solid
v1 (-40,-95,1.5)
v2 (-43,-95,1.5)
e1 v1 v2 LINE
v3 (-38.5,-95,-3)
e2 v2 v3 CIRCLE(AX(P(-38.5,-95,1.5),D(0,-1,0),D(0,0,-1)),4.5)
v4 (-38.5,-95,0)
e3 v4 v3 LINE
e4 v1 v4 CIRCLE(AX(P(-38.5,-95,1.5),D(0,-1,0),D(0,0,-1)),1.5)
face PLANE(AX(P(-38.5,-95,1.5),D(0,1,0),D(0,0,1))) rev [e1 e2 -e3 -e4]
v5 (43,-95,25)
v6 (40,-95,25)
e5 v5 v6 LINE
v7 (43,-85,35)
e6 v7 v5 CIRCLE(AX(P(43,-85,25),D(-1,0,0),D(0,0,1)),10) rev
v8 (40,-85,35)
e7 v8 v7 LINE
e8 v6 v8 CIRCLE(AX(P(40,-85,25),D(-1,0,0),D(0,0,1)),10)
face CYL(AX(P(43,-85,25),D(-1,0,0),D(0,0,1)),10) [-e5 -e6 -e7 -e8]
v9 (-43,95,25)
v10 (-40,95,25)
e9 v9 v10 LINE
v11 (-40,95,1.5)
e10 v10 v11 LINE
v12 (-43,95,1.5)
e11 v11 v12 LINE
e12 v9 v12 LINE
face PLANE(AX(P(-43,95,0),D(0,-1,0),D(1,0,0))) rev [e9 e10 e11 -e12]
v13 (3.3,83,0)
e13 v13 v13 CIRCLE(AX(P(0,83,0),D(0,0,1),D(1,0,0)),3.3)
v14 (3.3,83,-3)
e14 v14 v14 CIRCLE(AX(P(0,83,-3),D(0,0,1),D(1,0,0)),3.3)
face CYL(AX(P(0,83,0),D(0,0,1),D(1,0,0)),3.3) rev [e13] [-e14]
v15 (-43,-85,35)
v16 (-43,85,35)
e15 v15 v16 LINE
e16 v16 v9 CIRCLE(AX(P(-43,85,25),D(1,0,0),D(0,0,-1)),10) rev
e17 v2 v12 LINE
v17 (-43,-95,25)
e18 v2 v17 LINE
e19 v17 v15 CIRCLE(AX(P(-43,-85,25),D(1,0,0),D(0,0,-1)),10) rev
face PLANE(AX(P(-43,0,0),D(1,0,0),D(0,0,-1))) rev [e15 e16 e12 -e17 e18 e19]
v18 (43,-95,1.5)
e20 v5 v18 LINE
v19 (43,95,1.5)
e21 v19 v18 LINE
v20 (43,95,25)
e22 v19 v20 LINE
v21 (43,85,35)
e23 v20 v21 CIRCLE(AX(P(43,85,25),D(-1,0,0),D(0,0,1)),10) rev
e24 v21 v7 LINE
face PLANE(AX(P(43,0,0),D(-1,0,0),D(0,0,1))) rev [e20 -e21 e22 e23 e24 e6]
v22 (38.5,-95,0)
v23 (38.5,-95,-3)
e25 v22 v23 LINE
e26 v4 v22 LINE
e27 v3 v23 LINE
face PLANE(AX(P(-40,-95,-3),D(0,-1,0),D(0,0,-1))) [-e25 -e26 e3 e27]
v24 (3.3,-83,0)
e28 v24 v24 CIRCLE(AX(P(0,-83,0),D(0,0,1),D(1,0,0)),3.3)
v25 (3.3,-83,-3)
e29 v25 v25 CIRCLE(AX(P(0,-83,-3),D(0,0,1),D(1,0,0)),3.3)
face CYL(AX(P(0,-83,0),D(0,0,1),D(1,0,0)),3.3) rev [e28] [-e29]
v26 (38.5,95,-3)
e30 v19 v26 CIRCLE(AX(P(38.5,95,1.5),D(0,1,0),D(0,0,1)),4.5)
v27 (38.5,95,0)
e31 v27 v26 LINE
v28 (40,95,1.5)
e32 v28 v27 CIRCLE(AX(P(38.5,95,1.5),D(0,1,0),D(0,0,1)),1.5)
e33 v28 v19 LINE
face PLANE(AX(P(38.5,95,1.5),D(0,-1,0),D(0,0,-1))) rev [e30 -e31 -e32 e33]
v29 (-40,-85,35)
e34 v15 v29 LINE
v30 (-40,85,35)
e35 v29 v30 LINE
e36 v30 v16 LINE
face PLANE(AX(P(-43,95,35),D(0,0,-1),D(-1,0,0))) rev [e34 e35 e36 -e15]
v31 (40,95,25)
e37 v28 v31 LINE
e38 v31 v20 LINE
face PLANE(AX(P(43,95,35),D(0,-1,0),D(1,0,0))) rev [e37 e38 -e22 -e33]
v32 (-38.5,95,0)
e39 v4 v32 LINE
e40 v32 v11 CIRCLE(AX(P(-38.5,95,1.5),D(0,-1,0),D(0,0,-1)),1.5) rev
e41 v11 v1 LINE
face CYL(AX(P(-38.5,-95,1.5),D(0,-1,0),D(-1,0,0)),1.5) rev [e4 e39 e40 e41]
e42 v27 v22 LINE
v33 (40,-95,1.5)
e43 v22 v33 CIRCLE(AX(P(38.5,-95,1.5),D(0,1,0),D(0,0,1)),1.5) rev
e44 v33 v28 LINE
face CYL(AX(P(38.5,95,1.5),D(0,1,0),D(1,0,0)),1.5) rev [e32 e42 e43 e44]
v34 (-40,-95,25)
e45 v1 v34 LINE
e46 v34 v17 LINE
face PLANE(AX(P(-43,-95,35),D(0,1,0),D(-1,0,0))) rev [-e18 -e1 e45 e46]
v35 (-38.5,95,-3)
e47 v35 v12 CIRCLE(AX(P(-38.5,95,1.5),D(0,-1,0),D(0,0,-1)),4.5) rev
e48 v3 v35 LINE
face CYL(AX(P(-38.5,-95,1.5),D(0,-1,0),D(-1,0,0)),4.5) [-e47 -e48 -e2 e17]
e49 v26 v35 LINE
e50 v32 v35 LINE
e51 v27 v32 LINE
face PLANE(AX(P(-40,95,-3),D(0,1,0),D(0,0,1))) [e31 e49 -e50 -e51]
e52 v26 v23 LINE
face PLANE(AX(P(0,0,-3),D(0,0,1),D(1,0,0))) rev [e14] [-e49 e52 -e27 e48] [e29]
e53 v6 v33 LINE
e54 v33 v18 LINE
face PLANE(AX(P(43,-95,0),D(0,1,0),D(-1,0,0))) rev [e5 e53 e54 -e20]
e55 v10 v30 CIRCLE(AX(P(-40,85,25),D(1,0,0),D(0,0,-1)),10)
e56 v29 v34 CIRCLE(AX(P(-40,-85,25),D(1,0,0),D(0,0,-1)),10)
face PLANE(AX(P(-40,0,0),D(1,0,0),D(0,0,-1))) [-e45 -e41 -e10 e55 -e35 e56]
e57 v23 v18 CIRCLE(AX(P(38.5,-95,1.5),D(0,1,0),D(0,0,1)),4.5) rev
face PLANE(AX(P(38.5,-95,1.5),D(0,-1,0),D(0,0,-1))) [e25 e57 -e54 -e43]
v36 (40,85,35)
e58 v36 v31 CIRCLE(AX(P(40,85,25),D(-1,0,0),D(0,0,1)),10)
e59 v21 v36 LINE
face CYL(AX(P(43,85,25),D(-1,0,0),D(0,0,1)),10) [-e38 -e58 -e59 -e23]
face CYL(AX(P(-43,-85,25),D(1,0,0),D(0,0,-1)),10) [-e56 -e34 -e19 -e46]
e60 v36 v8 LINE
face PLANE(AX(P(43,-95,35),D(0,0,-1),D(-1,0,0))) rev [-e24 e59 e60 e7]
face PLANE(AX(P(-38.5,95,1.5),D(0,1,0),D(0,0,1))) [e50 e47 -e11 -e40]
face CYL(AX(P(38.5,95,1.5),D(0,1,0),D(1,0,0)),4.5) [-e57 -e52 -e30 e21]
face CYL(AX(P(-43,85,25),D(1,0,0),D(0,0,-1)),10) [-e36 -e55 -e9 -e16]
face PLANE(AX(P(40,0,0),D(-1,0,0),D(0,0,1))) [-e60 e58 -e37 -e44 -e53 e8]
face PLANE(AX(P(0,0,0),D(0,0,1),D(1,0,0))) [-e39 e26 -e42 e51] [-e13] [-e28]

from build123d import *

# Parameters (mm, degrees)
CROQUIS1_W                         = 80
CROQUIS1_H                         = 190
BRIDA_BASE1_DEPTH                  = 3
BRIDA_DE_ARISTA1_STRIP_W           = 15
BRIDA_DE_ARISTA1_STRIP_H           = 3
BRIDA_DE_ARISTA1_STRIP_CUT_DEPTH   = 190
BRIDA_DE_ARISTA1_STRIP_2_W         = 15
BRIDA_DE_ARISTA1_STRIP_2_H         = 3
BRIDA_DE_ARISTA1_STRIP_CUT_2_DEPTH = 190
BRIDA_DE_ARISTA1_DEPTH             = 190
BRIDA_DE_ARISTA1_BEND_DEPTH        = 190
TALADRO_DE_MARGEN_PARA_M61_D       = 6.6
TALADRO_DE_MARGEN_PARA_M61_DEPTH   = 500
TALADRO_DE_MARGEN_PARA_M61_TIP     = 1.982840043
REDONDEO2_R                        = 10


# Sheet-metal steps are written as plain solids
with BuildPart() as part:
    # Croquis1 → Brida base1 (new body)
    with BuildSketch(Plane.XY):
        Rectangle(CROQUIS1_W, CROQUIS1_H)
    extrude(amount=-BRIDA_BASE1_DEPTH)

    # Brida de arista1 strip (across the edge) → Brida de arista1 strip cut (cut)
    with BuildSketch(Plane(origin=(-40, 95, 0), x_dir=(1, 0, 0), z_dir=(0, -1, 0))):
        with Locations((-6, -1.5)):
            Rectangle(BRIDA_DE_ARISTA1_STRIP_W, BRIDA_DE_ARISTA1_STRIP_H)
    extrude(amount=BRIDA_DE_ARISTA1_STRIP_CUT_DEPTH, mode=Mode.SUBTRACT)

    # Brida de arista1 strip 2 (across the edge) → Brida de arista1 strip cut 2 (cut)
    with BuildSketch(Plane(origin=(40, -95, 0), x_dir=(-1, 0, 0), z_dir=(0, 1, 0))):
        with Locations((-6, -1.5)):
            Rectangle(BRIDA_DE_ARISTA1_STRIP_2_W, BRIDA_DE_ARISTA1_STRIP_2_H)
    extrude(amount=BRIDA_DE_ARISTA1_STRIP_CUT_2_DEPTH, mode=Mode.SUBTRACT)

    # Brida de arista1 section (across the edge) → Brida de arista1 (add)
    with BuildSketch(Plane(origin=(-40, 95, 0), x_dir=(1, 0, 0), z_dir=(0, -1, 0))):
        with BuildLine():
            Line((-3, 1.5), (-3, 35))
            Line((-3, 35), (0, 35))
            Line((0, 35), (0, 1.5))
            ThreePointArc((0, 1.5), (0.439339828, 0.439339828), (1.5, 0))
            Line((1.5, 0), (1.5, -3))
            ThreePointArc((1.5, -3), (-1.681980515, -1.681980515), (-3, 1.5))
        make_face()
    extrude(amount=BRIDA_DE_ARISTA1_DEPTH)

    # Brida de arista1 section 2 (across the edge) → Brida de arista1 bend (add)
    with BuildSketch(Plane(origin=(40, -95, 0), x_dir=(-1, 0, 0), z_dir=(0, 1, 0))):
        with BuildLine():
            Line((-3, 1.5), (-3, 35))
            Line((-3, 35), (0, 35))
            Line((0, 35), (0, 1.5))
            ThreePointArc((0, 1.5), (0.439339828, 0.439339828), (1.5, 0))
            Line((1.5, 0), (1.5, -3))
            ThreePointArc((1.5, -3), (-1.681980515, -1.681980515), (-3, 1.5))
        make_face()
    extrude(amount=BRIDA_DE_ARISTA1_BEND_DEPTH)

    # Taladro de margen para M61
    with Locations(Plane.XY):
        with Locations((0, 83), (0, -83)):
            Hole(TALADRO_DE_MARGEN_PARA_M61_D / 2, depth=TALADRO_DE_MARGEN_PARA_M61_DEPTH)
            with Locations((0, 0, -(TALADRO_DE_MARGEN_PARA_M61_DEPTH + TALADRO_DE_MARGEN_PARA_M61_TIP / 2))):  # 118° drill point
                Cone(0, TALADRO_DE_MARGEN_PARA_M61_D / 2, TALADRO_DE_MARGEN_PARA_M61_TIP, mode=Mode.SUBTRACT)

    # Redondeo2
    redondeo2_edges = [part.edges().sort_by_distance(p)[0] for p in [
        (-41.5, 95, 35),
        (-41.5, -95, 35),
        (41.5, -95, 35),
        (41.5, 95, 35),
    ]]
    fillet(redondeo2_edges, radius=REDONDEO2_R)


solid = part.part
